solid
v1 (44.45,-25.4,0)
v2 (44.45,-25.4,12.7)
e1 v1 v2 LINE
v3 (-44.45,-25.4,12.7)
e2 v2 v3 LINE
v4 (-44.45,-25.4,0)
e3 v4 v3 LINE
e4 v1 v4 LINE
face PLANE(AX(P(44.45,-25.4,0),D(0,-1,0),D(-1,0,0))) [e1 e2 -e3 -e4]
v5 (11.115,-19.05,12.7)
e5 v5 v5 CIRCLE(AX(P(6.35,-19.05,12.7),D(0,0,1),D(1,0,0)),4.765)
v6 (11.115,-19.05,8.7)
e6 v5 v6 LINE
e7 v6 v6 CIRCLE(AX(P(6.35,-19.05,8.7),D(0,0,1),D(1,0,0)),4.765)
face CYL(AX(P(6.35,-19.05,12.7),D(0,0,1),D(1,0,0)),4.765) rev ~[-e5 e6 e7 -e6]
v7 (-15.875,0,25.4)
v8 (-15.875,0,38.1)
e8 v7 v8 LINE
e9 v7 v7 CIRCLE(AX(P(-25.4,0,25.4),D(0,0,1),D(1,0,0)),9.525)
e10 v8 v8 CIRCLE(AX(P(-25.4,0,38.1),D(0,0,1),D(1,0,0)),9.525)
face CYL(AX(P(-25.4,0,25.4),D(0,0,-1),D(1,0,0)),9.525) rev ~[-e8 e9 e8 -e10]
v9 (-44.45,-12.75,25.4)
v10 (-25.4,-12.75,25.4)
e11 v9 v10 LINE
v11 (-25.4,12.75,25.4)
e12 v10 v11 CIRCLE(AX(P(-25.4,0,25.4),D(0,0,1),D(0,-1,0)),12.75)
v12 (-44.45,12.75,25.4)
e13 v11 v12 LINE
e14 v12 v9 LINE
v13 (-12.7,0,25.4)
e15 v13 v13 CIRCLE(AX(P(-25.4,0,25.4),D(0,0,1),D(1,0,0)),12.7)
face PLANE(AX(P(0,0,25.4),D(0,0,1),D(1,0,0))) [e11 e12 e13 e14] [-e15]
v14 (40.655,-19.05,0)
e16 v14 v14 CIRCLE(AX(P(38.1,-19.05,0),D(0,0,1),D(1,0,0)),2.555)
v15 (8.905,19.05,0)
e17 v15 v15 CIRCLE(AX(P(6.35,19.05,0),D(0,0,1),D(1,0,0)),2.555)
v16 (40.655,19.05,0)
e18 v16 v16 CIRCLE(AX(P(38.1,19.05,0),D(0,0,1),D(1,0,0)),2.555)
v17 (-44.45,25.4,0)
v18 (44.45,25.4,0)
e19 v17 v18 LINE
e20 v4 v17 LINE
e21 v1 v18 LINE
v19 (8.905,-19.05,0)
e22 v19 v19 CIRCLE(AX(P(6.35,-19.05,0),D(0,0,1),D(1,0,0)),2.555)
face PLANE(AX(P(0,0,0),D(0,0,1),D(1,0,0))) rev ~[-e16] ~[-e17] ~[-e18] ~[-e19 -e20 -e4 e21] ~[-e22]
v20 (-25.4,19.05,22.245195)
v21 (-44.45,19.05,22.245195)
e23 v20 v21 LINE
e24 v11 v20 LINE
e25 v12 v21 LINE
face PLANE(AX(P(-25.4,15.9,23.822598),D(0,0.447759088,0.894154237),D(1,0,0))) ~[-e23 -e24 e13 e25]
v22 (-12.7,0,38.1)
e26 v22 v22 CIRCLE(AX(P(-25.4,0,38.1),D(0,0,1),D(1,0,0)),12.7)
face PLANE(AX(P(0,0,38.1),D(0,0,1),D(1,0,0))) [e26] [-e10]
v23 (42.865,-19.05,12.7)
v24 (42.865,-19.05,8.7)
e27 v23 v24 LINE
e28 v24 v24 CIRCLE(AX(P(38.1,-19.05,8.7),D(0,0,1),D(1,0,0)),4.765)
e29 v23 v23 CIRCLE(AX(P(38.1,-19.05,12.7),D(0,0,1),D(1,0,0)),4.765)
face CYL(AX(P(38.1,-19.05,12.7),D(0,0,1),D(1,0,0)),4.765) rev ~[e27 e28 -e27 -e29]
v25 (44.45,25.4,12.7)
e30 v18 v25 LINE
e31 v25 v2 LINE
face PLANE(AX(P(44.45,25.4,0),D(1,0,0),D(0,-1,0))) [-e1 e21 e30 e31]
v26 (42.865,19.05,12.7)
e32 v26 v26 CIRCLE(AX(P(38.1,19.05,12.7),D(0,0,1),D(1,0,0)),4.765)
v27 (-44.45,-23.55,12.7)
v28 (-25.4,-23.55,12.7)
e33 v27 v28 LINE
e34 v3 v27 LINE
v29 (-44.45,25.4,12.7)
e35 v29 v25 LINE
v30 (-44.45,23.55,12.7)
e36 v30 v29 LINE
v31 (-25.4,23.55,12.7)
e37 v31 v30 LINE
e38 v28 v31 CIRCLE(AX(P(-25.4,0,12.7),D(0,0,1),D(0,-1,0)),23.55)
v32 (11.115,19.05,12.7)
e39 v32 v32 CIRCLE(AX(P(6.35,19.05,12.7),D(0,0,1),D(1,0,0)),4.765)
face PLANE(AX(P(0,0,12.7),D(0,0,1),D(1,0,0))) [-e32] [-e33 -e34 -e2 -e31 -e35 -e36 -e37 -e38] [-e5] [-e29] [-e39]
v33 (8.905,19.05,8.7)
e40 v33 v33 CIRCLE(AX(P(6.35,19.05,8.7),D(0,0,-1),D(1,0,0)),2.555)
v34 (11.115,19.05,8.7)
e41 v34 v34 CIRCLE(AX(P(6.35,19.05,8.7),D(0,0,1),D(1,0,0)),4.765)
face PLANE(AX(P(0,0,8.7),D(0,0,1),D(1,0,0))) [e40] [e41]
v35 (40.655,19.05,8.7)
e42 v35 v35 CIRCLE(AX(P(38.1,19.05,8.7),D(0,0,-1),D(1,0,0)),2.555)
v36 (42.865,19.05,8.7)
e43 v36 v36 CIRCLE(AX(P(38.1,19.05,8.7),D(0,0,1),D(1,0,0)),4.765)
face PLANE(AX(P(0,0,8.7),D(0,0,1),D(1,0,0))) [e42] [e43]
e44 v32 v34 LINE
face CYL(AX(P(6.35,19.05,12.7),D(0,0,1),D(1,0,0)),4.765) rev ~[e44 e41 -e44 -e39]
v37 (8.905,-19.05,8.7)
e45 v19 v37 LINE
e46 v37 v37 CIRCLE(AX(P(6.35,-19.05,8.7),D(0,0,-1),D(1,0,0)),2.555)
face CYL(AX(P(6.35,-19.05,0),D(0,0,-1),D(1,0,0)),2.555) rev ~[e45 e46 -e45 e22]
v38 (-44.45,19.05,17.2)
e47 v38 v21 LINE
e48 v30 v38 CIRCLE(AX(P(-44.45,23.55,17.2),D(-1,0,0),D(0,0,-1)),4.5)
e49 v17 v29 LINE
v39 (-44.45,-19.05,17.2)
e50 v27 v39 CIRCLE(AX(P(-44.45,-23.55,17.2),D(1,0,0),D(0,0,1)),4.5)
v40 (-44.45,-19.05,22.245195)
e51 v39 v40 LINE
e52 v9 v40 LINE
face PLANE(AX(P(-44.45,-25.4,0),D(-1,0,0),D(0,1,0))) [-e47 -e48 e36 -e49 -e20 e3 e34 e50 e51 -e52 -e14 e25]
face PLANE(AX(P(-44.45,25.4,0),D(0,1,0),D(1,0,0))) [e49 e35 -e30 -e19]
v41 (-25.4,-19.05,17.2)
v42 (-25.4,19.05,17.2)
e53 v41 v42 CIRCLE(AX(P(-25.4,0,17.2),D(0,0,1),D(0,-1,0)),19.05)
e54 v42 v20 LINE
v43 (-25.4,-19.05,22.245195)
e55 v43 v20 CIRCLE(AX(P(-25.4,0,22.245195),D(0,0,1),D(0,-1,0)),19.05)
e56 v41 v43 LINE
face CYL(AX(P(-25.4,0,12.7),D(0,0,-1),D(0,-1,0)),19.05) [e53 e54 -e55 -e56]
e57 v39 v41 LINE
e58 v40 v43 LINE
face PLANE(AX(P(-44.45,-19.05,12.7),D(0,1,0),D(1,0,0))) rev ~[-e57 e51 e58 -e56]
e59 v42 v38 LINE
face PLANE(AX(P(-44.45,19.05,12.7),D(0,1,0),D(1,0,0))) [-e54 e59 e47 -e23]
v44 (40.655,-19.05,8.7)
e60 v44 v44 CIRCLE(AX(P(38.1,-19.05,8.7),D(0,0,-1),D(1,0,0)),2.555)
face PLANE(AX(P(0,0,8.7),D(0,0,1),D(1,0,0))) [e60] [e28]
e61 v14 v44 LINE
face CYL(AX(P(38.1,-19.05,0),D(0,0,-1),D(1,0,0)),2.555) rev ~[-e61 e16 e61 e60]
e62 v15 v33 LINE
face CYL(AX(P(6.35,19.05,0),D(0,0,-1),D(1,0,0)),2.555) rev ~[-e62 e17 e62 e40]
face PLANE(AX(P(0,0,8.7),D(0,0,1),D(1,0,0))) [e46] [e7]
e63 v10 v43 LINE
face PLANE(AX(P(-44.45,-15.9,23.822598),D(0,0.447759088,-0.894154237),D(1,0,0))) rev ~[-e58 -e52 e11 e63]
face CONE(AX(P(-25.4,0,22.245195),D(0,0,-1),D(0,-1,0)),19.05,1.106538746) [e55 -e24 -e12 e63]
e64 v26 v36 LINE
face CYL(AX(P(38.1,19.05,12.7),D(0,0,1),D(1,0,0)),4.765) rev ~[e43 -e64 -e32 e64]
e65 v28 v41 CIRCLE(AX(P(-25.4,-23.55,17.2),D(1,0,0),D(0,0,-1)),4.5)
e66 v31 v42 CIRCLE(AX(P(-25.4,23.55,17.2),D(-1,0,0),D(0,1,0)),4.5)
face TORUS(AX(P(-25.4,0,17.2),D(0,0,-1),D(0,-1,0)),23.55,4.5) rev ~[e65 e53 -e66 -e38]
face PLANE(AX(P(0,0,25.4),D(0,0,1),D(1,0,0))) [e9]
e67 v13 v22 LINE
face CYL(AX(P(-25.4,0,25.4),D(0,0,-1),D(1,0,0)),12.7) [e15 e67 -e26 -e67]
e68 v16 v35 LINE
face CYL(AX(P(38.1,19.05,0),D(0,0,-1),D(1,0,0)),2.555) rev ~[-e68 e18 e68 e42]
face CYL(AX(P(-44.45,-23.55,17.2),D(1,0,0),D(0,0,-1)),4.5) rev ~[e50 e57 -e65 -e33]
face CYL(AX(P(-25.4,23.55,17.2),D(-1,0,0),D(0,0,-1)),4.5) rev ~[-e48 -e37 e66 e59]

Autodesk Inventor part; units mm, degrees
ref_plane "YZ Plane" through (0, 0, 0) normal (1, 0, 0) x (0, 1, 0)
ref_plane "XZ Plane" through (0, 0, 0) normal (0, 1, 0) x (-1, 0, 0)
ref_plane "XY Plane" through (0, 0, 0) normal (0, 0, 1) x (1, 0, 0)
sketch "Sketch1" plane through (0, 0, 0) normal (0, 0, 1) x (1, 0, 0)
  line L0 (-273.2587, 58.9048) -> (-103.4873, 58.9048) construction
  line L1 (-103.4873, 58.9048) -> (-103.4873, -61.7557) construction
  line L2 (-103.4873, -61.7557) -> (-273.2587, -61.7557) construction
  line L3 (-273.2587, -61.7557) -> (-273.2587, 58.9048) construction
  line L4 (-44.45, 25.4) -> (44.45, 25.4)
  line L5 (44.45, 25.4) -> (44.45, -25.4)
  line L6 (44.45, -25.4) -> (-44.45, -25.4)
  line L7 (-44.45, -25.4) -> (-44.45, 25.4)
  line L8 (-44.45, 25.4) -> (44.45, -25.4) construction
  line L9 (44.45, 25.4) -> (-44.45, -25.4) construction
  circle A0 centre (38.1, 19.05) radius 2.555
  circle A1 centre (6.35, 19.05) radius 2.555
  line L10 (0, 0) -> (70.2377, 0)
  circle A2 centre (38.1, -19.05) radius 2.555
  circle A3 centre (6.35, -19.05) radius 2.555
  dimension "d5" = 88.9
  dimension "d6" = 50.8
  dimension "d7" = 5.11
  dimension "d8" = 6.35
  dimension "d9" = 6.35
  dimension "d11" = 5.11
extrude "Extrusion1" add sketch "Sketch1" along normal blind 12.7
sketch "Sketch2" plane through (0, 0, 12.7) normal (0, 0, 1) x (1, 0, 0)
  circle A0 centre (6.35, 19.05) radius 2.555 projected
  circle A1 centre (6.35, 19.05) radius 4.765
  circle A2 centre (38.1, 19.05) radius 2.555 projected
  circle A3 centre (38.1, 19.05) radius 4.765
  circle A4 centre (6.35, -19.05) radius 2.555 projected
  circle A5 centre (6.35, -19.05) radius 4.765
  circle A6 centre (38.1, -19.05) radius 2.555 projected
  circle A7 centre (38.1, -19.05) radius 4.765
  point P0 (0, 0)
  dimension "d19" = 9.53
  dimension "d20" = 9.53
  dimension "d21" = 9.53
  dimension "d22" = 9.53
extrude "Extrusion2" cut sketch "Sketch2" against normal blind 4 contours A0 | A1 | A2 | A3 | A4 | A5 | A6 | A7
sketch "Sketch3" plane through (0, 0, 12.7) normal (0, 0, 1) x (1, 0, 0)
  line L0 (-44.45, 25.4) -> (-44.45, -25.4) projected
  line L1 (-44.45, -19.05) -> (-25.4, -19.05)
  line L2 (-44.45, 19.05) -> (-25.4, 19.05)
  arc A0 (-25.4, -19.05) -> (-25.4, 19.05) centre (-25.4, 0) ccw
  line L3 (-44.45, -19.05) -> (-44.45, 19.05)
  point P0 (0, 0)
  dimension "d25" = 19.05
  dimension "d26" = 19.05
  dimension "d29" = 19.05
extrude "Extrusion3" add sketch "Sketch3" along normal blind 12.7
fillet "Face Fillet1" radius 4.5 1 edges at (-34.925, -19.05, 12.7)
sketch "Sketch4" plane through (0, 0, 25.4) normal (0, 0, 1) x (1, 0, 0)
  arc A0 (-25.4, -19.05) -> (-25.4, 19.05) centre (-25.4, 0) ccw projected
  line L0 (-44.45, 19.05) -> (-44.45, -19.05) projected
  line L1 (-44.45, -12.7) -> (-44.45, 12.7)
  point P0 (0, 0)
extrude "Extrusion4" [suppressed]
sketch "Sketch5" plane through (0, 0, 25.4) normal (0, 0, 1) x (1, 0, 0)
  arc A0 (-25.4, -19.05) -> (-25.4, 19.05) centre (-25.4, 0) ccw projected
  circle A1 centre (-25.4, 0) radius 12.7
  circle A2 centre (-25.4, 0) radius 9.525
  point P0 (0, 0)
  dimension "d38" = 25.4
  dimension "d39" = 19.05
extrude "Extrusion5" add sketch "Sketch5" along normal blind 12.7
chamfer "Chamfer1" distance 6.3 angle 26.6 3 edges at (-34.925, -19.05, 25.4) (-6.35, 0, 25.4) (-34.925, 19.05, 25.4) measured on face at (-42.3333, 0, 25.4)
sketch "Sketch6" plane through (-25.4, 0, 25.4) normal (0, 0, 1) x (1, 0, 0)
  circle A0 centre (0, 0) radius 9.525 projected
  circle A1 centre (0, 0) radius 9.525
  point P0 (25.4, 0)
properties part number "cad@49"
